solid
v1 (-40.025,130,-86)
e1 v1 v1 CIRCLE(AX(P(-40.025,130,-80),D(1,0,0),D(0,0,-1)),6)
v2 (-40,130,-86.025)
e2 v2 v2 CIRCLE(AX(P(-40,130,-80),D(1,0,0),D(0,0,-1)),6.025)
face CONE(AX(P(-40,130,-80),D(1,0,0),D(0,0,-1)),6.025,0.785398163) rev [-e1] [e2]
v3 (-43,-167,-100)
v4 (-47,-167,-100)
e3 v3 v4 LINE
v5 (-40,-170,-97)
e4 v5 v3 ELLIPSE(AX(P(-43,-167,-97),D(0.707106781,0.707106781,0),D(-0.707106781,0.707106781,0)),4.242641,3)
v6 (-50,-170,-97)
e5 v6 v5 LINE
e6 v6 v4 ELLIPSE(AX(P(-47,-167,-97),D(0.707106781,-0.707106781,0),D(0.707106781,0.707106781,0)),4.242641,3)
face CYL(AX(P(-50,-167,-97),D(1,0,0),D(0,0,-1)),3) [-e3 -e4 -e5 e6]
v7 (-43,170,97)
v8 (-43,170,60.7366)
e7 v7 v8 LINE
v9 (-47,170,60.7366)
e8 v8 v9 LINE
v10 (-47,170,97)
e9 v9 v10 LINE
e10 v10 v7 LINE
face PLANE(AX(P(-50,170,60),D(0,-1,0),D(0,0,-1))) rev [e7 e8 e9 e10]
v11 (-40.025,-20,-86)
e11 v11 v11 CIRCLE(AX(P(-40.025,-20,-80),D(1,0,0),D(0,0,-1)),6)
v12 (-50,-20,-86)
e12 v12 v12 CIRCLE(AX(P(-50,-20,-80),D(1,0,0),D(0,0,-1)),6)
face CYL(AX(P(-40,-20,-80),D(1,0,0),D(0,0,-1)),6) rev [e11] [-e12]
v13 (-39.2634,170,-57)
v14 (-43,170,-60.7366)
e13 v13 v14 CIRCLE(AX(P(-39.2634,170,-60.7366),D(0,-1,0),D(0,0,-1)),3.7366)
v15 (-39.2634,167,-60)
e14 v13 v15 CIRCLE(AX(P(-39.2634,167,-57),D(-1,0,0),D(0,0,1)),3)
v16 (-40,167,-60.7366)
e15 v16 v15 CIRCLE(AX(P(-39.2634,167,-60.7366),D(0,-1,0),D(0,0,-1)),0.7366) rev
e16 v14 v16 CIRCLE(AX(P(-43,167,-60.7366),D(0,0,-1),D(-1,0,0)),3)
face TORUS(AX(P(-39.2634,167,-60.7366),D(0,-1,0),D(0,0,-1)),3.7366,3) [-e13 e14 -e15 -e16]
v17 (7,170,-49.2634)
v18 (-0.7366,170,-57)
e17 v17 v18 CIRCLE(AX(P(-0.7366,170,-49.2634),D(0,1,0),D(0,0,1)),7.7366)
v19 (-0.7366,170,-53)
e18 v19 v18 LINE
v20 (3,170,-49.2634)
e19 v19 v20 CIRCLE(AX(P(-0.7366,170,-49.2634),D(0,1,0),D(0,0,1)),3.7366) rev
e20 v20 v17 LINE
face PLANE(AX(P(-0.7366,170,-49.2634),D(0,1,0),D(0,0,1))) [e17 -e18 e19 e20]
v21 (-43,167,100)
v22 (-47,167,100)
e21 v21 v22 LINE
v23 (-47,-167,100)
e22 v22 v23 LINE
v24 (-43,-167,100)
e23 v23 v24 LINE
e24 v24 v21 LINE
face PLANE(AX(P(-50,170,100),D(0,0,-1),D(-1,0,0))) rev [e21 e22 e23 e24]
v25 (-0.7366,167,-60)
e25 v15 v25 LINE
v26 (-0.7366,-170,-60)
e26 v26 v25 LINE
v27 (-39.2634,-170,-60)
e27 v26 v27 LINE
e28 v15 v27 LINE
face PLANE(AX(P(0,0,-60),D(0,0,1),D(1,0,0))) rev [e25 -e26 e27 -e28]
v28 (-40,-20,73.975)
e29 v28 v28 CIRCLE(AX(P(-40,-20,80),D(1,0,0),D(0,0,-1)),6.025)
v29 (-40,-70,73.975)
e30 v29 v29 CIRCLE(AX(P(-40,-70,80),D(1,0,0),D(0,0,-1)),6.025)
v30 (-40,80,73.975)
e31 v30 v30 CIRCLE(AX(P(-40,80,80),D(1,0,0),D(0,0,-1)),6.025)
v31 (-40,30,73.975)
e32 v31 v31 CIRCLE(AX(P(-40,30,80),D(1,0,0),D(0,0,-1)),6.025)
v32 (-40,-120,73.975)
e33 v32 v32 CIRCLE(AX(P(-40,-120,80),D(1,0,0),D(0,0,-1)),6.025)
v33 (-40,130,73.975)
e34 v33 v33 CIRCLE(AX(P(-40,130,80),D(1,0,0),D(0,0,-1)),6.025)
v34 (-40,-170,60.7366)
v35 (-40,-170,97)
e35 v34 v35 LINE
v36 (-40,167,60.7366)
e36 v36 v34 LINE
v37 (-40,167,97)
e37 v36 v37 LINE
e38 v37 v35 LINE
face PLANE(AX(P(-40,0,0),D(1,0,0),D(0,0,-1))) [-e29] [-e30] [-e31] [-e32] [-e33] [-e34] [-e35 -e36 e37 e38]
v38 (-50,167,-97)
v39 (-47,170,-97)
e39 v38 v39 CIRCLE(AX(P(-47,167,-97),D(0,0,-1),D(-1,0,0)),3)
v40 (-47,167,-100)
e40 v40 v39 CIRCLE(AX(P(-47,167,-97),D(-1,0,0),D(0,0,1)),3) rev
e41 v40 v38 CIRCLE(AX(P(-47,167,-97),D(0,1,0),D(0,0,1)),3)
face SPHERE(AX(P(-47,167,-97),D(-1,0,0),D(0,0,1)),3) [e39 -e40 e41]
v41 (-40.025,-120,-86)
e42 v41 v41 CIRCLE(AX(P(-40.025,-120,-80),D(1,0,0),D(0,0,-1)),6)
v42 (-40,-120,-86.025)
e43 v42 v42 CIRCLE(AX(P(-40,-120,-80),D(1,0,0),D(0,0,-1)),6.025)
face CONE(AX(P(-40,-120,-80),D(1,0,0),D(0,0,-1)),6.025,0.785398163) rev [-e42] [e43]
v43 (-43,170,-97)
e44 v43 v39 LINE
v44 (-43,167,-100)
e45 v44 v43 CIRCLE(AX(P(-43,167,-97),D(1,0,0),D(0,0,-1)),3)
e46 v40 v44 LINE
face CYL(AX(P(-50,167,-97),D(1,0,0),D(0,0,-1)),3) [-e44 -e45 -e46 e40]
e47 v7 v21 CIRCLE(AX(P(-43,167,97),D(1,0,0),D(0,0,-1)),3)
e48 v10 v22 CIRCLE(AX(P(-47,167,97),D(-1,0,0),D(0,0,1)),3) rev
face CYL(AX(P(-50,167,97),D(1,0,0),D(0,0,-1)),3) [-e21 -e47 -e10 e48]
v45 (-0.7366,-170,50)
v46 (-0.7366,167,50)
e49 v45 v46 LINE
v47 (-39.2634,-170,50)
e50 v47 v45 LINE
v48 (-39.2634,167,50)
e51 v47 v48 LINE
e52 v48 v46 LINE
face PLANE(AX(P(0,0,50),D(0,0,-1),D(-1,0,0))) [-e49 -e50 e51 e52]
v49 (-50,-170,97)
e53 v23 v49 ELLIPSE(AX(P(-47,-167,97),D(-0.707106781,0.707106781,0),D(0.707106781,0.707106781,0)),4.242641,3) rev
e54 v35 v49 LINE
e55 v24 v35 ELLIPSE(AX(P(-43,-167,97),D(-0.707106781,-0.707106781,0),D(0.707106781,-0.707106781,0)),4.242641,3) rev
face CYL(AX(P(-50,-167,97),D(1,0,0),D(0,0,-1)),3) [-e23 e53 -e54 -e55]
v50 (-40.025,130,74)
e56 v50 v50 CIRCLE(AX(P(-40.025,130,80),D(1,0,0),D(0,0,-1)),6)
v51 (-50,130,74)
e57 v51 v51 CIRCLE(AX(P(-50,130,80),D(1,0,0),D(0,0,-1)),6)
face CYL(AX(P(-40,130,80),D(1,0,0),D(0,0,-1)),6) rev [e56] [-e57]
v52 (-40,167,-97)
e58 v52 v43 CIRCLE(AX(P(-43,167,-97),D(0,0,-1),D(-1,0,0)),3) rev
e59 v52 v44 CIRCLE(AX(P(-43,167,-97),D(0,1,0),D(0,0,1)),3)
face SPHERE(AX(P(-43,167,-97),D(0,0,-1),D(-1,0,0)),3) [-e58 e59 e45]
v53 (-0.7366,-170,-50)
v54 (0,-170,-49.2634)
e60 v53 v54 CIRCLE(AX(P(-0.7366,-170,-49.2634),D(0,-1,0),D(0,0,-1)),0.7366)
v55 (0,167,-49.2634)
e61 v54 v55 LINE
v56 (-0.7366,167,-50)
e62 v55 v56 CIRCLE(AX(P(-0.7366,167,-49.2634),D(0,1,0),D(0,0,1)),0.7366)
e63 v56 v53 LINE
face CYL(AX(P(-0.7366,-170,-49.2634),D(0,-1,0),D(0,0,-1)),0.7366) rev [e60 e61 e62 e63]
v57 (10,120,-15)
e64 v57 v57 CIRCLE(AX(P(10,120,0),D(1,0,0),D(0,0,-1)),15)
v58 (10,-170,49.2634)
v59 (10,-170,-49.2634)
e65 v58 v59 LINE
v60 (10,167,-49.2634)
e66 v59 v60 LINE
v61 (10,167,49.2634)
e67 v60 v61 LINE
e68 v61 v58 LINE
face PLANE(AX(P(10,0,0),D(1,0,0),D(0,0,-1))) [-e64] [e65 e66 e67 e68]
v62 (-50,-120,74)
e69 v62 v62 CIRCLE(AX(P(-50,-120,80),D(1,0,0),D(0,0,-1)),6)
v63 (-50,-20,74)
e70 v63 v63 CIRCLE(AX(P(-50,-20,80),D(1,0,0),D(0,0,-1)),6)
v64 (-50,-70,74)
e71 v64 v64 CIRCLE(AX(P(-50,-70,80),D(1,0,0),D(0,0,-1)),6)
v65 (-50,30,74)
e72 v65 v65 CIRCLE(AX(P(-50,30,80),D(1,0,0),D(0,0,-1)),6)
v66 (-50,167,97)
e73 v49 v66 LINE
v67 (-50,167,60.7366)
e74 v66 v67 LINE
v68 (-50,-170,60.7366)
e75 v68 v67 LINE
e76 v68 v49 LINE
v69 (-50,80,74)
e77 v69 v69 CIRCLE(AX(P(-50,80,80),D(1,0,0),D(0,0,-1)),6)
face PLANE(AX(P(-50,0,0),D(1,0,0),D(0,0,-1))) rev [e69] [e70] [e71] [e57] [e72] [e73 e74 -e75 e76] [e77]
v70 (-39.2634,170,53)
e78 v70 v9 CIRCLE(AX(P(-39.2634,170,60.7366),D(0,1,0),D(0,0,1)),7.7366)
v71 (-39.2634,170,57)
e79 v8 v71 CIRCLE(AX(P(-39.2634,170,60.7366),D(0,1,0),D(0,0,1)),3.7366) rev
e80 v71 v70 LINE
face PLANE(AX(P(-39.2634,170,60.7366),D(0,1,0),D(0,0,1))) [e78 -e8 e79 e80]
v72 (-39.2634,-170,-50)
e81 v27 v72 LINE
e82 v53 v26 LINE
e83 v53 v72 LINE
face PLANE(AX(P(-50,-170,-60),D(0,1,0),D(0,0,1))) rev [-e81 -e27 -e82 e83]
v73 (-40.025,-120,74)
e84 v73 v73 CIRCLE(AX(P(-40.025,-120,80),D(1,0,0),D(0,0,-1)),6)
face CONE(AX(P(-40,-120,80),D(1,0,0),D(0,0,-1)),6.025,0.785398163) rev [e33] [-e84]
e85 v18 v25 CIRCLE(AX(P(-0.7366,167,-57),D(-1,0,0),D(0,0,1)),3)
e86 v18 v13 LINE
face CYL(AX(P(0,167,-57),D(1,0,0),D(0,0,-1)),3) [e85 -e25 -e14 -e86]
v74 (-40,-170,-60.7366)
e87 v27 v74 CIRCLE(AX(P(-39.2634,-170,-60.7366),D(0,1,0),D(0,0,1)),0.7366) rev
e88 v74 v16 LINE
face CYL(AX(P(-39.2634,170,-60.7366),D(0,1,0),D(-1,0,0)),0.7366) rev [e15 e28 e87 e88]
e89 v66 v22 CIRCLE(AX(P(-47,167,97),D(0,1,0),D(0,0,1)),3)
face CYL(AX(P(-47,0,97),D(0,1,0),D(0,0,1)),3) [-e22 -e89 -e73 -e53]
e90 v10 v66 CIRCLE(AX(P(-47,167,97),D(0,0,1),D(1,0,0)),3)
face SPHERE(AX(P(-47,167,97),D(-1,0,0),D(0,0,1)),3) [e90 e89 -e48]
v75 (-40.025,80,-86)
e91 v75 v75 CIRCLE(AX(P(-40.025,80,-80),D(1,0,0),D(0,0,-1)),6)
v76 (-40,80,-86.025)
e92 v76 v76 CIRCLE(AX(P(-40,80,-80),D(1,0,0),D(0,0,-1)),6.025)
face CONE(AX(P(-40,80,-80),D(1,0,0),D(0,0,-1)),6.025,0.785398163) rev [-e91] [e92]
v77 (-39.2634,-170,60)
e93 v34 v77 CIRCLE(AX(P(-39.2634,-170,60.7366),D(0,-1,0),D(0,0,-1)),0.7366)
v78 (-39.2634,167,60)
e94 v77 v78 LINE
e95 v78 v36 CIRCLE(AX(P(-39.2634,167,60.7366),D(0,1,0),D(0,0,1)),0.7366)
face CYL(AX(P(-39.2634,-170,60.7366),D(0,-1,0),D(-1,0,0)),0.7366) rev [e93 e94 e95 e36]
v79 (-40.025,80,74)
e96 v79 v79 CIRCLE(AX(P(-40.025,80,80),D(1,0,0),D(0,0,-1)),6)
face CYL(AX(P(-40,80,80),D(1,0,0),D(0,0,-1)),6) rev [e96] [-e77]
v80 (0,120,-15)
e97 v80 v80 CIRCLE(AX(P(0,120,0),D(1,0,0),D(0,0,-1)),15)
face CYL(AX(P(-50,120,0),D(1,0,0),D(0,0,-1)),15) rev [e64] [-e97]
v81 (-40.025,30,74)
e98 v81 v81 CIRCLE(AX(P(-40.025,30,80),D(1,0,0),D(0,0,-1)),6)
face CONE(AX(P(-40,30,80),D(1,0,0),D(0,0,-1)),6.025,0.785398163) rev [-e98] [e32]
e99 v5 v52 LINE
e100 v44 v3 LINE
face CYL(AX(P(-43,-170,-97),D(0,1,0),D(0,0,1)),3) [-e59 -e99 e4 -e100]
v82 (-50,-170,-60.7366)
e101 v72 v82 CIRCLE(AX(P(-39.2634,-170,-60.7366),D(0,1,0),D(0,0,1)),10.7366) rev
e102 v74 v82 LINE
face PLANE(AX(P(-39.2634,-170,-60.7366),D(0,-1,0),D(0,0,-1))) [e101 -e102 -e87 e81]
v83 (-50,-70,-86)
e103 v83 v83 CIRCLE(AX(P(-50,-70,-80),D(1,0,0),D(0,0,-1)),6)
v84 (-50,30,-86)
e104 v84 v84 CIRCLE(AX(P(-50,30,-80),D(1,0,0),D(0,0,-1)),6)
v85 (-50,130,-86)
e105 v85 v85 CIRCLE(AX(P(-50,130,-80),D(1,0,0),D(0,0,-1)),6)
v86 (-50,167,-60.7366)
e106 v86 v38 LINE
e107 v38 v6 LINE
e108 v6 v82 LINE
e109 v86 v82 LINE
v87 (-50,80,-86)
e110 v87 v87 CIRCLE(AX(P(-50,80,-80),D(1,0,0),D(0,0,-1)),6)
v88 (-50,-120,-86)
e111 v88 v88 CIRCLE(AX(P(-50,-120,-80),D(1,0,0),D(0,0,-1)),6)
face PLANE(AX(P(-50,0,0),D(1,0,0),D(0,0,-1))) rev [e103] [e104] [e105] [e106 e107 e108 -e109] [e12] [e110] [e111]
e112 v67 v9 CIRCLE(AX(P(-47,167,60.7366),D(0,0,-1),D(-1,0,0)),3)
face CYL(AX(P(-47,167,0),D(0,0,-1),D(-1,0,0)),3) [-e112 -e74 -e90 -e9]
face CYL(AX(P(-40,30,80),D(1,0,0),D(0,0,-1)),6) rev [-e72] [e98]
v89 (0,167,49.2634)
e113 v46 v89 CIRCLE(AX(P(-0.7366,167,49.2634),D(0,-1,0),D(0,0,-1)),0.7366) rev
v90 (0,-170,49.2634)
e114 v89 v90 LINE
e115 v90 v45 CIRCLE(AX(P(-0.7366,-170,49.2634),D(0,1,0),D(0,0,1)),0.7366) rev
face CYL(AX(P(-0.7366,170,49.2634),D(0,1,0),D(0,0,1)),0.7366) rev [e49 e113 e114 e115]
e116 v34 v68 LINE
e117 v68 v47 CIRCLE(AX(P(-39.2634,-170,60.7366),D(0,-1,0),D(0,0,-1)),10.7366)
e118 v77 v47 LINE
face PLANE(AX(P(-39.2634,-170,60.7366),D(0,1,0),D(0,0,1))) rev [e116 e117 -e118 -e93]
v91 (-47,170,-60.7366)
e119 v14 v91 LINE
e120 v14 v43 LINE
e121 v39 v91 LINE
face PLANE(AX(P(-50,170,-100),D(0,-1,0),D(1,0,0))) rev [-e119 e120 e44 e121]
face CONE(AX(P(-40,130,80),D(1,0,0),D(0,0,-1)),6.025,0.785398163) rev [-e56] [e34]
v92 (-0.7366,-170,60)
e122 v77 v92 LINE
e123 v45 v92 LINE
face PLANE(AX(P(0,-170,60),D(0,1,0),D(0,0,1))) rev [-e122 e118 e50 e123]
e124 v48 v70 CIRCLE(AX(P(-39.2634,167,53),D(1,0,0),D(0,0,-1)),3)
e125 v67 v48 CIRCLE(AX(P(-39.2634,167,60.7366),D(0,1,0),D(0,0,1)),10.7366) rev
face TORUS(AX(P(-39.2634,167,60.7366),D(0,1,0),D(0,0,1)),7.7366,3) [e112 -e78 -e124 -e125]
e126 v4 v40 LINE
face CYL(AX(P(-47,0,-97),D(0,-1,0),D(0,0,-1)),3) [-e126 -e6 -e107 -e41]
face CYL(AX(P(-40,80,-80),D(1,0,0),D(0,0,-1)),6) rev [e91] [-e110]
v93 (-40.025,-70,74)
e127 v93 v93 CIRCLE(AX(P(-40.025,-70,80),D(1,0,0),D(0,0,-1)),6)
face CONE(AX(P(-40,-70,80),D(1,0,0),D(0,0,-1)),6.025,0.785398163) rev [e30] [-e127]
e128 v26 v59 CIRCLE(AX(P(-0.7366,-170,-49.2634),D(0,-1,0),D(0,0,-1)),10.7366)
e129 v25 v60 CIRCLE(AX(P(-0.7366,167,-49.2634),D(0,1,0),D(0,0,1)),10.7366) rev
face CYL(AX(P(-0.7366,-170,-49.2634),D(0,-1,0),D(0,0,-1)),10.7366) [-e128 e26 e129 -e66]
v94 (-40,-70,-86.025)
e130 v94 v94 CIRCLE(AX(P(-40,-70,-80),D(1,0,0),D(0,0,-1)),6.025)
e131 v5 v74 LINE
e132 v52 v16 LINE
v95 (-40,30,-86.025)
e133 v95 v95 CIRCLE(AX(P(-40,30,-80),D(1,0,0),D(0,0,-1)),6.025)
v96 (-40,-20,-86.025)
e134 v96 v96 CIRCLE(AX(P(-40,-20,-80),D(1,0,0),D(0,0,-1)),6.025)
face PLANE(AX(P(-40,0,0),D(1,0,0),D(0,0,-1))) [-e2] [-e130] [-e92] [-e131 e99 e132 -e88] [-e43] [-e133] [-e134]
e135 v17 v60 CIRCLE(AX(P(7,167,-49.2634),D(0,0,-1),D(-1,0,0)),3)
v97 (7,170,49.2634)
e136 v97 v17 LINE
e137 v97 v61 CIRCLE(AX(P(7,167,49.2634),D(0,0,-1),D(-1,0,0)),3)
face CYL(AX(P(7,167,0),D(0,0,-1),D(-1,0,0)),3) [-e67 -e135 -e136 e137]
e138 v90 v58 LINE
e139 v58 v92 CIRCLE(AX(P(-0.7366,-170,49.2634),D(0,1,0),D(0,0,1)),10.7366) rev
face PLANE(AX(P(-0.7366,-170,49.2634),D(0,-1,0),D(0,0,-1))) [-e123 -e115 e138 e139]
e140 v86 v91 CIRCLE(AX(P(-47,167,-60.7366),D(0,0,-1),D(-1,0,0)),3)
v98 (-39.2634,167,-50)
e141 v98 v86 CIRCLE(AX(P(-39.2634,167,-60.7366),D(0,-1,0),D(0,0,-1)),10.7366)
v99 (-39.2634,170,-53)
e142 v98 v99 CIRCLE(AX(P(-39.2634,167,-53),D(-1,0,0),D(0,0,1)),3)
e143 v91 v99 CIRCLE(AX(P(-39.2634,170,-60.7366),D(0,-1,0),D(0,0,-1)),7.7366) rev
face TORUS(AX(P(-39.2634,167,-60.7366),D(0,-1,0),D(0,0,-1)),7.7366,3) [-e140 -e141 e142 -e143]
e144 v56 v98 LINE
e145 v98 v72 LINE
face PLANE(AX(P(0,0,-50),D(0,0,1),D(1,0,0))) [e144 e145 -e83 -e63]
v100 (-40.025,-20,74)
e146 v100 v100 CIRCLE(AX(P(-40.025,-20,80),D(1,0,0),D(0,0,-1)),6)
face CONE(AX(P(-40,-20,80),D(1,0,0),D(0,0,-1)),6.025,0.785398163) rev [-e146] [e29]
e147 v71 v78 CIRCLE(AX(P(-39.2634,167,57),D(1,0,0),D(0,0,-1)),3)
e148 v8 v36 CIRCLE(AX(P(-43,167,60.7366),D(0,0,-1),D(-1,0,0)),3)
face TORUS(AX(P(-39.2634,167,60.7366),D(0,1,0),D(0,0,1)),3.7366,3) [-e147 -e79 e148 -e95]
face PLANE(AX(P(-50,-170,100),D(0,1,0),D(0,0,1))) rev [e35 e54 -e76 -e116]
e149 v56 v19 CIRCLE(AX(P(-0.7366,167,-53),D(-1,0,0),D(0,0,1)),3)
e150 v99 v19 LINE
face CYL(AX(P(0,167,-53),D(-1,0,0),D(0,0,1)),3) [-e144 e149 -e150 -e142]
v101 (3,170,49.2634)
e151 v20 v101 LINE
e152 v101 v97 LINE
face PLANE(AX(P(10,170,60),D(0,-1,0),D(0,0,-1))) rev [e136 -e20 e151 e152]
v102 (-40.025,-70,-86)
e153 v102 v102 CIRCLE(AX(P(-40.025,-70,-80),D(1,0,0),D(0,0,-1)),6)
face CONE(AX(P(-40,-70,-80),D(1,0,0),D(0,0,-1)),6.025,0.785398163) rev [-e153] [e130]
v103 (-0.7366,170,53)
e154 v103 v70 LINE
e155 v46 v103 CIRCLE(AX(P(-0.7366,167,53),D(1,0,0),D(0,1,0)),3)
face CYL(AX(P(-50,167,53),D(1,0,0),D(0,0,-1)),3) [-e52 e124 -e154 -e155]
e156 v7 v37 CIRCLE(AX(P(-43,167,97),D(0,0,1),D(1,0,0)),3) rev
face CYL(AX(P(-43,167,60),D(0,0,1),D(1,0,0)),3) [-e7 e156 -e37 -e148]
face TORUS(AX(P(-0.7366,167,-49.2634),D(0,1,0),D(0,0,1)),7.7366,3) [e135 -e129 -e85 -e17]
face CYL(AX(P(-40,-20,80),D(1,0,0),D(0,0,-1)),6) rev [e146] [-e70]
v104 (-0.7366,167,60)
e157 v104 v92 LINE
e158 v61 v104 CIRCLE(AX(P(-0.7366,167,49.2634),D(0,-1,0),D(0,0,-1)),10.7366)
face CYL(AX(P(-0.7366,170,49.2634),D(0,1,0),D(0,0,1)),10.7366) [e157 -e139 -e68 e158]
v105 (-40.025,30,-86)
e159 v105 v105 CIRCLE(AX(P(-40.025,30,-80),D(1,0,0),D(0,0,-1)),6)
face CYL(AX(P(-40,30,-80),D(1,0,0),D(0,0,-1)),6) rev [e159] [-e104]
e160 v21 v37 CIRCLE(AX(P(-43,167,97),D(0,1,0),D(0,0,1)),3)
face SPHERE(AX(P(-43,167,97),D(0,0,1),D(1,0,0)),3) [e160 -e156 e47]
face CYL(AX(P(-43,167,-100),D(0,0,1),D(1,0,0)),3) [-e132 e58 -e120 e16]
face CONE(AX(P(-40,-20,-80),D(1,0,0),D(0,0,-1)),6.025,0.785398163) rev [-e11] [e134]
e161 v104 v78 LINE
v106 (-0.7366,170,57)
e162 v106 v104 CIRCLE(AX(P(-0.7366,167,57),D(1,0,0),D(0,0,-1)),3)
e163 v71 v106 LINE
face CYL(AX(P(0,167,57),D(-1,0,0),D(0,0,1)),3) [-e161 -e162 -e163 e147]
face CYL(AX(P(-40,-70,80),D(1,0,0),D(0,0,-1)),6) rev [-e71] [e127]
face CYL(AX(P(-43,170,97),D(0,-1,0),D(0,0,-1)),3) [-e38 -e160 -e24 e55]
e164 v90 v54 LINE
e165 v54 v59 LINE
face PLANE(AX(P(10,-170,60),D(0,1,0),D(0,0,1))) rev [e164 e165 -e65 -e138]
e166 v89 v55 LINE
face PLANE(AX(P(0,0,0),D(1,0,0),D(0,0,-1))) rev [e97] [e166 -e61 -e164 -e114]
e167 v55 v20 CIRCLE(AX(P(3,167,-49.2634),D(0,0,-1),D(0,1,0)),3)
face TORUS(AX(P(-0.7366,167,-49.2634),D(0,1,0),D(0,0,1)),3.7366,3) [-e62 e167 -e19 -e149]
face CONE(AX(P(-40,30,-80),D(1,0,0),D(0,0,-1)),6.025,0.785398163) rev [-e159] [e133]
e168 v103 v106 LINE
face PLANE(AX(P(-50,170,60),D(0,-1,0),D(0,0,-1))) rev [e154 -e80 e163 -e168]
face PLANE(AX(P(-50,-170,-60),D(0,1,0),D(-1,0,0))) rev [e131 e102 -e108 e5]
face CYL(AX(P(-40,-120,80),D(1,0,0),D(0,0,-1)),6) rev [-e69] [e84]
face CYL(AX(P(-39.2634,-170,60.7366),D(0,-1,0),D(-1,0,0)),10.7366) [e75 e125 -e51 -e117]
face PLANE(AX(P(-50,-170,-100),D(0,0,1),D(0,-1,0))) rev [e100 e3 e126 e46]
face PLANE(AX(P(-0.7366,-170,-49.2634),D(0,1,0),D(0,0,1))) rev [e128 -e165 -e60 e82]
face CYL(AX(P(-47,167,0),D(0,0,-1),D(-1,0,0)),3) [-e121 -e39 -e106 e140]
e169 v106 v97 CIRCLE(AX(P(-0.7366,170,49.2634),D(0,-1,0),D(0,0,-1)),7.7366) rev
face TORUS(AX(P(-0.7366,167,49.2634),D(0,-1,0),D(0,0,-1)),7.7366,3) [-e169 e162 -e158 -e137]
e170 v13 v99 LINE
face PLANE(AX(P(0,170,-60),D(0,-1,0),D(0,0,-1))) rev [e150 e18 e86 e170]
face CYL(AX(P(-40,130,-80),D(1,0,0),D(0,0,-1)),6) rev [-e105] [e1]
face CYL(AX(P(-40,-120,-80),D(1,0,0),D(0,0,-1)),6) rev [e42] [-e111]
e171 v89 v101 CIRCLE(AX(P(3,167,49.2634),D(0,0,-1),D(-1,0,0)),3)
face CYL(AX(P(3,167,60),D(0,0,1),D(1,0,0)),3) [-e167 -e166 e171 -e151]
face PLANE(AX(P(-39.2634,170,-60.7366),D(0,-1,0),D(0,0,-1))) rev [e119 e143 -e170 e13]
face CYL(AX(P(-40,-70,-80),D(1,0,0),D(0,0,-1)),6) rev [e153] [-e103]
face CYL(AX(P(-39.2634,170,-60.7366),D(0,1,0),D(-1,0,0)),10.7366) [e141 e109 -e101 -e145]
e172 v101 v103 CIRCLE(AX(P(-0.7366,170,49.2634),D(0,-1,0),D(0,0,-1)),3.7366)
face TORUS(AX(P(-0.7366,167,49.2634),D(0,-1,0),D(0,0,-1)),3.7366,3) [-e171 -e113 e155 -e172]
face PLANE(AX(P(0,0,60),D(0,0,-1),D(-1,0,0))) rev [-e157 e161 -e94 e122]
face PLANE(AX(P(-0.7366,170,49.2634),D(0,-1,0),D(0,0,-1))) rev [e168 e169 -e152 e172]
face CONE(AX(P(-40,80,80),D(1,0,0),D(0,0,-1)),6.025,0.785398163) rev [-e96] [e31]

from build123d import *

# Parameters (mm, degrees)
SKETCH1_W                       = 120
SKETCH1_H                       = 340
BASE_FLANGE1_DEPTH              = 10
EDGE_FLANGE1_STRIP_W            = 41.4732
EDGE_FLANGE1_STRIP_H            = 10
EDGE_FLANGE1_STRIP_CUT_DEPTH    = 340
EDGE_FLANGE1_STRIP_2_W          = 41.4732
EDGE_FLANGE1_STRIP_2_H          = 10
EDGE_FLANGE1_STRIP_CUT_2_DEPTH  = 340
EDGE_FLANGE1_DEPTH              = 340
EDGE_FLANGE1_BEND_DEPTH         = 340
EDGE_FLANGE2_STRIP_W            = 41.4732
EDGE_FLANGE2_STRIP_H            = 10
EDGE_FLANGE2_STRIP_CUT_DEPTH    = 340
EDGE_FLANGE2_STRIP_2_W          = 41.4732
EDGE_FLANGE2_STRIP_2_H          = 10
EDGE_FLANGE2_STRIP_CUT_2_DEPTH  = 340
EDGE_FLANGE2_DEPTH              = 340
EDGE_FLANGE2_BEND_DEPTH         = 340
SKETCH18_R                      = 15
CUT_EXTRUDE1_DEPTH              = 207.155281281
M10_CLEARANCE_HOLE1_D           = 12
M10_CLEARANCE_HOLE1_CSINK_D     = 12.05
M10_CLEARANCE_HOLE1_CSINK_ANGLE = 90
FILLET1_R                       = 3


# Sheet-metal steps are written as plain solids
with BuildPart() as part:
    # Sketch1 → Base-Flange1 (new body)
    with BuildSketch(Plane(origin=(0, 0, 0), x_dir=(0, 0, -1), z_dir=(1, 0, 0))):
        Rectangle(SKETCH1_W, SKETCH1_H)
    extrude(amount=BASE_FLANGE1_DEPTH)

    # Edge-Flange1 strip (across the edge) → Edge-Flange1 strip cut (cut)
    with BuildSketch(Plane(origin=(0, -170, 60), x_dir=(0, 0, -1), z_dir=(0, 1, 0))):
        with Locations((-10, -5)):
            Rectangle(EDGE_FLANGE1_STRIP_W, EDGE_FLANGE1_STRIP_H)
    extrude(amount=EDGE_FLANGE1_STRIP_CUT_DEPTH, mode=Mode.SUBTRACT)

    # Edge-Flange1 strip 2 (across the edge) → Edge-Flange1 strip cut 2 (cut)
    with BuildSketch(Plane(origin=(0, 170, -60), x_dir=(0, 0, 1), z_dir=(0, -1, 0))):
        with Locations((-10, -5)):
            Rectangle(EDGE_FLANGE1_STRIP_2_W, EDGE_FLANGE1_STRIP_2_H)
    extrude(amount=EDGE_FLANGE1_STRIP_CUT_2_DEPTH, mode=Mode.SUBTRACT)

    # Edge-Flange1 section (across the edge) → Edge-Flange1 (add)
    with BuildSketch(Plane(origin=(0, -170, 60), x_dir=(0, 0, -1), z_dir=(0, 1, 0))):
        with BuildLine():
            Line((0, 0.7366), (0, 50))
            Line((0, 50), (10, 50))
            Line((10, 50), (10, 0.7366))
            ThreePointArc((10, 0.7366), (10.215745145, 0.215745145), (10.7366, 0))
            Line((10.7366, 0), (10.7366, -10))
            ThreePointArc((10.7366, -10), (3.144677333, -6.855322667), (0, 0.7366))
        make_face()
    extrude(amount=EDGE_FLANGE1_DEPTH)

    # Edge-Flange1 section 2 (across the edge) → Edge-Flange1 bend (add)
    with BuildSketch(Plane(origin=(0, 170, -60), x_dir=(0, 0, 1), z_dir=(0, -1, 0))):
        with BuildLine():
            Line((0, 0.7366), (0, 50))
            Line((0, 50), (10, 50))
            Line((10, 50), (10, 0.7366))
            ThreePointArc((10, 0.7366), (10.215745145, 0.215745145), (10.7366, 0))
            Line((10.7366, 0), (10.7366, -10))
            ThreePointArc((10.7366, -10), (3.144677333, -6.855322667), (0, 0.7366))
        make_face()
    extrude(amount=EDGE_FLANGE1_BEND_DEPTH)

    # Edge-Flange2 strip (across the edge) → Edge-Flange2 strip cut (cut)
    with BuildSketch(Plane(origin=(-50, 170, 60), x_dir=(1, 0, 0), z_dir=(0, -1, 0))):
        with Locations((-10, -5)):
            Rectangle(EDGE_FLANGE2_STRIP_W, EDGE_FLANGE2_STRIP_H)
    extrude(amount=EDGE_FLANGE2_STRIP_CUT_DEPTH, mode=Mode.SUBTRACT)

    # Edge-Flange2 strip 2 (across the edge) → Edge-Flange2 strip cut 2 (cut)
    with BuildSketch(Plane(origin=(-50, -170, -60), x_dir=(1, 0, 0), z_dir=(0, 1, 0))):
        with Locations((-10, -5)):
            Rectangle(EDGE_FLANGE2_STRIP_2_W, EDGE_FLANGE2_STRIP_2_H)
    extrude(amount=EDGE_FLANGE2_STRIP_CUT_2_DEPTH, mode=Mode.SUBTRACT)

    # Edge-Flange2 section (across the edge) → Edge-Flange2 (add)
    with BuildSketch(Plane(origin=(-50, 170, 60), x_dir=(1, 0, 0), z_dir=(0, -1, 0))):
        with BuildLine():
            Line((0, 0.7366), (0, 40))
            Line((0, 40), (10, 40))
            Line((10, 40), (10, 0.7366))
            ThreePointArc((10, 0.7366), (10.215745145, 0.215745145), (10.7366, 0))
            Line((10.7366, 0), (10.7366, -10))
            ThreePointArc((10.7366, -10), (3.144677333, -6.855322667), (0, 0.7366))
        make_face()
    extrude(amount=EDGE_FLANGE2_DEPTH)

    # Edge-Flange2 section 2 (across the edge) → Edge-Flange2 bend (add)
    with BuildSketch(Plane(origin=(-50, -170, -60), x_dir=(1, 0, 0), z_dir=(0, 1, 0))):
        with BuildLine():
            Line((0, 0.7366), (0, 40))
            Line((0, 40), (10, 40))
            Line((10, 40), (10, 0.7366))
            ThreePointArc((10, 0.7366), (10.215745145, 0.215745145), (10.7366, 0))
            Line((10.7366, 0), (10.7366, -10))
            ThreePointArc((10.7366, -10), (3.144677333, -6.855322667), (0, 0.7366))
        make_face()
    extrude(amount=EDGE_FLANGE2_BEND_DEPTH)

    # Sketch18 → Cut-Extrude1 (cut, through all)
    with BuildSketch(Plane(origin=(10, 0, 0), x_dir=(0, 0, -1), z_dir=(1, 0, 0))):
        with Locations((0, 120)):
            Circle(SKETCH18_R)
    extrude(amount=-CUT_EXTRUDE1_DEPTH, mode=Mode.SUBTRACT)

    # M10 Clearance Hole1 (through all)
    with Locations(Plane(origin=(-40, 0, 0), x_dir=(0, 0, -1), z_dir=(1, 0, 0))):
        with Locations((80, -120), (80, -70), (80, -20), (80, 30), (80, 80), (80, 130)):
            m10_clearance_hole1 = CounterSinkHole(M10_CLEARANCE_HOLE1_D / 2, M10_CLEARANCE_HOLE1_CSINK_D / 2, counter_sink_angle=M10_CLEARANCE_HOLE1_CSINK_ANGLE)

    # Mirror1: M10 Clearance Hole1 across plane
    add(m10_clearance_hole1.mirror(Plane.XY), mode=Mode.SUBTRACT)

    # Fillet1
    fillet1_edges = [part.edges().sort_by_distance(p)[0] for p in [
        (-46.855322667, 170, 53.144677333),
        (-39.784254855, 170, 60.215745145),
        (-45, 170, 100),
        (-40, 170, 80.3683),
        (-50, 0, 100),
        (-50, 170, 80.3683),
        (-40, 0, 100),
        (-45, -170, 100),
        (-46.855322667, 170, -53.144677333),
        (-39.784254855, 170, -60.215745145),
        (-45, -170, -100),
        (-40, 170, -80.3683),
        (-50, 170, -80.3683),
        (-50, 0, -100),
        (-40, 0, -100),
        (-45, 170, -100),
        (0, 170, 0),
        (10, 170, 0),
        (6.855322667, 170, 56.855322667),
        (-0.215745145, 170, 49.784254855),
        (-20, 170, 50),
        (-20, 170, 60),
        (6.855322667, 170, -56.855322667),
        (-0.215745145, 170, -49.784254855),
        (-20, 170, -50),
        (-20, 170, -60),
    ]]
    fillet(fillet1_edges, radius=FILLET1_R)


solid = part.part
